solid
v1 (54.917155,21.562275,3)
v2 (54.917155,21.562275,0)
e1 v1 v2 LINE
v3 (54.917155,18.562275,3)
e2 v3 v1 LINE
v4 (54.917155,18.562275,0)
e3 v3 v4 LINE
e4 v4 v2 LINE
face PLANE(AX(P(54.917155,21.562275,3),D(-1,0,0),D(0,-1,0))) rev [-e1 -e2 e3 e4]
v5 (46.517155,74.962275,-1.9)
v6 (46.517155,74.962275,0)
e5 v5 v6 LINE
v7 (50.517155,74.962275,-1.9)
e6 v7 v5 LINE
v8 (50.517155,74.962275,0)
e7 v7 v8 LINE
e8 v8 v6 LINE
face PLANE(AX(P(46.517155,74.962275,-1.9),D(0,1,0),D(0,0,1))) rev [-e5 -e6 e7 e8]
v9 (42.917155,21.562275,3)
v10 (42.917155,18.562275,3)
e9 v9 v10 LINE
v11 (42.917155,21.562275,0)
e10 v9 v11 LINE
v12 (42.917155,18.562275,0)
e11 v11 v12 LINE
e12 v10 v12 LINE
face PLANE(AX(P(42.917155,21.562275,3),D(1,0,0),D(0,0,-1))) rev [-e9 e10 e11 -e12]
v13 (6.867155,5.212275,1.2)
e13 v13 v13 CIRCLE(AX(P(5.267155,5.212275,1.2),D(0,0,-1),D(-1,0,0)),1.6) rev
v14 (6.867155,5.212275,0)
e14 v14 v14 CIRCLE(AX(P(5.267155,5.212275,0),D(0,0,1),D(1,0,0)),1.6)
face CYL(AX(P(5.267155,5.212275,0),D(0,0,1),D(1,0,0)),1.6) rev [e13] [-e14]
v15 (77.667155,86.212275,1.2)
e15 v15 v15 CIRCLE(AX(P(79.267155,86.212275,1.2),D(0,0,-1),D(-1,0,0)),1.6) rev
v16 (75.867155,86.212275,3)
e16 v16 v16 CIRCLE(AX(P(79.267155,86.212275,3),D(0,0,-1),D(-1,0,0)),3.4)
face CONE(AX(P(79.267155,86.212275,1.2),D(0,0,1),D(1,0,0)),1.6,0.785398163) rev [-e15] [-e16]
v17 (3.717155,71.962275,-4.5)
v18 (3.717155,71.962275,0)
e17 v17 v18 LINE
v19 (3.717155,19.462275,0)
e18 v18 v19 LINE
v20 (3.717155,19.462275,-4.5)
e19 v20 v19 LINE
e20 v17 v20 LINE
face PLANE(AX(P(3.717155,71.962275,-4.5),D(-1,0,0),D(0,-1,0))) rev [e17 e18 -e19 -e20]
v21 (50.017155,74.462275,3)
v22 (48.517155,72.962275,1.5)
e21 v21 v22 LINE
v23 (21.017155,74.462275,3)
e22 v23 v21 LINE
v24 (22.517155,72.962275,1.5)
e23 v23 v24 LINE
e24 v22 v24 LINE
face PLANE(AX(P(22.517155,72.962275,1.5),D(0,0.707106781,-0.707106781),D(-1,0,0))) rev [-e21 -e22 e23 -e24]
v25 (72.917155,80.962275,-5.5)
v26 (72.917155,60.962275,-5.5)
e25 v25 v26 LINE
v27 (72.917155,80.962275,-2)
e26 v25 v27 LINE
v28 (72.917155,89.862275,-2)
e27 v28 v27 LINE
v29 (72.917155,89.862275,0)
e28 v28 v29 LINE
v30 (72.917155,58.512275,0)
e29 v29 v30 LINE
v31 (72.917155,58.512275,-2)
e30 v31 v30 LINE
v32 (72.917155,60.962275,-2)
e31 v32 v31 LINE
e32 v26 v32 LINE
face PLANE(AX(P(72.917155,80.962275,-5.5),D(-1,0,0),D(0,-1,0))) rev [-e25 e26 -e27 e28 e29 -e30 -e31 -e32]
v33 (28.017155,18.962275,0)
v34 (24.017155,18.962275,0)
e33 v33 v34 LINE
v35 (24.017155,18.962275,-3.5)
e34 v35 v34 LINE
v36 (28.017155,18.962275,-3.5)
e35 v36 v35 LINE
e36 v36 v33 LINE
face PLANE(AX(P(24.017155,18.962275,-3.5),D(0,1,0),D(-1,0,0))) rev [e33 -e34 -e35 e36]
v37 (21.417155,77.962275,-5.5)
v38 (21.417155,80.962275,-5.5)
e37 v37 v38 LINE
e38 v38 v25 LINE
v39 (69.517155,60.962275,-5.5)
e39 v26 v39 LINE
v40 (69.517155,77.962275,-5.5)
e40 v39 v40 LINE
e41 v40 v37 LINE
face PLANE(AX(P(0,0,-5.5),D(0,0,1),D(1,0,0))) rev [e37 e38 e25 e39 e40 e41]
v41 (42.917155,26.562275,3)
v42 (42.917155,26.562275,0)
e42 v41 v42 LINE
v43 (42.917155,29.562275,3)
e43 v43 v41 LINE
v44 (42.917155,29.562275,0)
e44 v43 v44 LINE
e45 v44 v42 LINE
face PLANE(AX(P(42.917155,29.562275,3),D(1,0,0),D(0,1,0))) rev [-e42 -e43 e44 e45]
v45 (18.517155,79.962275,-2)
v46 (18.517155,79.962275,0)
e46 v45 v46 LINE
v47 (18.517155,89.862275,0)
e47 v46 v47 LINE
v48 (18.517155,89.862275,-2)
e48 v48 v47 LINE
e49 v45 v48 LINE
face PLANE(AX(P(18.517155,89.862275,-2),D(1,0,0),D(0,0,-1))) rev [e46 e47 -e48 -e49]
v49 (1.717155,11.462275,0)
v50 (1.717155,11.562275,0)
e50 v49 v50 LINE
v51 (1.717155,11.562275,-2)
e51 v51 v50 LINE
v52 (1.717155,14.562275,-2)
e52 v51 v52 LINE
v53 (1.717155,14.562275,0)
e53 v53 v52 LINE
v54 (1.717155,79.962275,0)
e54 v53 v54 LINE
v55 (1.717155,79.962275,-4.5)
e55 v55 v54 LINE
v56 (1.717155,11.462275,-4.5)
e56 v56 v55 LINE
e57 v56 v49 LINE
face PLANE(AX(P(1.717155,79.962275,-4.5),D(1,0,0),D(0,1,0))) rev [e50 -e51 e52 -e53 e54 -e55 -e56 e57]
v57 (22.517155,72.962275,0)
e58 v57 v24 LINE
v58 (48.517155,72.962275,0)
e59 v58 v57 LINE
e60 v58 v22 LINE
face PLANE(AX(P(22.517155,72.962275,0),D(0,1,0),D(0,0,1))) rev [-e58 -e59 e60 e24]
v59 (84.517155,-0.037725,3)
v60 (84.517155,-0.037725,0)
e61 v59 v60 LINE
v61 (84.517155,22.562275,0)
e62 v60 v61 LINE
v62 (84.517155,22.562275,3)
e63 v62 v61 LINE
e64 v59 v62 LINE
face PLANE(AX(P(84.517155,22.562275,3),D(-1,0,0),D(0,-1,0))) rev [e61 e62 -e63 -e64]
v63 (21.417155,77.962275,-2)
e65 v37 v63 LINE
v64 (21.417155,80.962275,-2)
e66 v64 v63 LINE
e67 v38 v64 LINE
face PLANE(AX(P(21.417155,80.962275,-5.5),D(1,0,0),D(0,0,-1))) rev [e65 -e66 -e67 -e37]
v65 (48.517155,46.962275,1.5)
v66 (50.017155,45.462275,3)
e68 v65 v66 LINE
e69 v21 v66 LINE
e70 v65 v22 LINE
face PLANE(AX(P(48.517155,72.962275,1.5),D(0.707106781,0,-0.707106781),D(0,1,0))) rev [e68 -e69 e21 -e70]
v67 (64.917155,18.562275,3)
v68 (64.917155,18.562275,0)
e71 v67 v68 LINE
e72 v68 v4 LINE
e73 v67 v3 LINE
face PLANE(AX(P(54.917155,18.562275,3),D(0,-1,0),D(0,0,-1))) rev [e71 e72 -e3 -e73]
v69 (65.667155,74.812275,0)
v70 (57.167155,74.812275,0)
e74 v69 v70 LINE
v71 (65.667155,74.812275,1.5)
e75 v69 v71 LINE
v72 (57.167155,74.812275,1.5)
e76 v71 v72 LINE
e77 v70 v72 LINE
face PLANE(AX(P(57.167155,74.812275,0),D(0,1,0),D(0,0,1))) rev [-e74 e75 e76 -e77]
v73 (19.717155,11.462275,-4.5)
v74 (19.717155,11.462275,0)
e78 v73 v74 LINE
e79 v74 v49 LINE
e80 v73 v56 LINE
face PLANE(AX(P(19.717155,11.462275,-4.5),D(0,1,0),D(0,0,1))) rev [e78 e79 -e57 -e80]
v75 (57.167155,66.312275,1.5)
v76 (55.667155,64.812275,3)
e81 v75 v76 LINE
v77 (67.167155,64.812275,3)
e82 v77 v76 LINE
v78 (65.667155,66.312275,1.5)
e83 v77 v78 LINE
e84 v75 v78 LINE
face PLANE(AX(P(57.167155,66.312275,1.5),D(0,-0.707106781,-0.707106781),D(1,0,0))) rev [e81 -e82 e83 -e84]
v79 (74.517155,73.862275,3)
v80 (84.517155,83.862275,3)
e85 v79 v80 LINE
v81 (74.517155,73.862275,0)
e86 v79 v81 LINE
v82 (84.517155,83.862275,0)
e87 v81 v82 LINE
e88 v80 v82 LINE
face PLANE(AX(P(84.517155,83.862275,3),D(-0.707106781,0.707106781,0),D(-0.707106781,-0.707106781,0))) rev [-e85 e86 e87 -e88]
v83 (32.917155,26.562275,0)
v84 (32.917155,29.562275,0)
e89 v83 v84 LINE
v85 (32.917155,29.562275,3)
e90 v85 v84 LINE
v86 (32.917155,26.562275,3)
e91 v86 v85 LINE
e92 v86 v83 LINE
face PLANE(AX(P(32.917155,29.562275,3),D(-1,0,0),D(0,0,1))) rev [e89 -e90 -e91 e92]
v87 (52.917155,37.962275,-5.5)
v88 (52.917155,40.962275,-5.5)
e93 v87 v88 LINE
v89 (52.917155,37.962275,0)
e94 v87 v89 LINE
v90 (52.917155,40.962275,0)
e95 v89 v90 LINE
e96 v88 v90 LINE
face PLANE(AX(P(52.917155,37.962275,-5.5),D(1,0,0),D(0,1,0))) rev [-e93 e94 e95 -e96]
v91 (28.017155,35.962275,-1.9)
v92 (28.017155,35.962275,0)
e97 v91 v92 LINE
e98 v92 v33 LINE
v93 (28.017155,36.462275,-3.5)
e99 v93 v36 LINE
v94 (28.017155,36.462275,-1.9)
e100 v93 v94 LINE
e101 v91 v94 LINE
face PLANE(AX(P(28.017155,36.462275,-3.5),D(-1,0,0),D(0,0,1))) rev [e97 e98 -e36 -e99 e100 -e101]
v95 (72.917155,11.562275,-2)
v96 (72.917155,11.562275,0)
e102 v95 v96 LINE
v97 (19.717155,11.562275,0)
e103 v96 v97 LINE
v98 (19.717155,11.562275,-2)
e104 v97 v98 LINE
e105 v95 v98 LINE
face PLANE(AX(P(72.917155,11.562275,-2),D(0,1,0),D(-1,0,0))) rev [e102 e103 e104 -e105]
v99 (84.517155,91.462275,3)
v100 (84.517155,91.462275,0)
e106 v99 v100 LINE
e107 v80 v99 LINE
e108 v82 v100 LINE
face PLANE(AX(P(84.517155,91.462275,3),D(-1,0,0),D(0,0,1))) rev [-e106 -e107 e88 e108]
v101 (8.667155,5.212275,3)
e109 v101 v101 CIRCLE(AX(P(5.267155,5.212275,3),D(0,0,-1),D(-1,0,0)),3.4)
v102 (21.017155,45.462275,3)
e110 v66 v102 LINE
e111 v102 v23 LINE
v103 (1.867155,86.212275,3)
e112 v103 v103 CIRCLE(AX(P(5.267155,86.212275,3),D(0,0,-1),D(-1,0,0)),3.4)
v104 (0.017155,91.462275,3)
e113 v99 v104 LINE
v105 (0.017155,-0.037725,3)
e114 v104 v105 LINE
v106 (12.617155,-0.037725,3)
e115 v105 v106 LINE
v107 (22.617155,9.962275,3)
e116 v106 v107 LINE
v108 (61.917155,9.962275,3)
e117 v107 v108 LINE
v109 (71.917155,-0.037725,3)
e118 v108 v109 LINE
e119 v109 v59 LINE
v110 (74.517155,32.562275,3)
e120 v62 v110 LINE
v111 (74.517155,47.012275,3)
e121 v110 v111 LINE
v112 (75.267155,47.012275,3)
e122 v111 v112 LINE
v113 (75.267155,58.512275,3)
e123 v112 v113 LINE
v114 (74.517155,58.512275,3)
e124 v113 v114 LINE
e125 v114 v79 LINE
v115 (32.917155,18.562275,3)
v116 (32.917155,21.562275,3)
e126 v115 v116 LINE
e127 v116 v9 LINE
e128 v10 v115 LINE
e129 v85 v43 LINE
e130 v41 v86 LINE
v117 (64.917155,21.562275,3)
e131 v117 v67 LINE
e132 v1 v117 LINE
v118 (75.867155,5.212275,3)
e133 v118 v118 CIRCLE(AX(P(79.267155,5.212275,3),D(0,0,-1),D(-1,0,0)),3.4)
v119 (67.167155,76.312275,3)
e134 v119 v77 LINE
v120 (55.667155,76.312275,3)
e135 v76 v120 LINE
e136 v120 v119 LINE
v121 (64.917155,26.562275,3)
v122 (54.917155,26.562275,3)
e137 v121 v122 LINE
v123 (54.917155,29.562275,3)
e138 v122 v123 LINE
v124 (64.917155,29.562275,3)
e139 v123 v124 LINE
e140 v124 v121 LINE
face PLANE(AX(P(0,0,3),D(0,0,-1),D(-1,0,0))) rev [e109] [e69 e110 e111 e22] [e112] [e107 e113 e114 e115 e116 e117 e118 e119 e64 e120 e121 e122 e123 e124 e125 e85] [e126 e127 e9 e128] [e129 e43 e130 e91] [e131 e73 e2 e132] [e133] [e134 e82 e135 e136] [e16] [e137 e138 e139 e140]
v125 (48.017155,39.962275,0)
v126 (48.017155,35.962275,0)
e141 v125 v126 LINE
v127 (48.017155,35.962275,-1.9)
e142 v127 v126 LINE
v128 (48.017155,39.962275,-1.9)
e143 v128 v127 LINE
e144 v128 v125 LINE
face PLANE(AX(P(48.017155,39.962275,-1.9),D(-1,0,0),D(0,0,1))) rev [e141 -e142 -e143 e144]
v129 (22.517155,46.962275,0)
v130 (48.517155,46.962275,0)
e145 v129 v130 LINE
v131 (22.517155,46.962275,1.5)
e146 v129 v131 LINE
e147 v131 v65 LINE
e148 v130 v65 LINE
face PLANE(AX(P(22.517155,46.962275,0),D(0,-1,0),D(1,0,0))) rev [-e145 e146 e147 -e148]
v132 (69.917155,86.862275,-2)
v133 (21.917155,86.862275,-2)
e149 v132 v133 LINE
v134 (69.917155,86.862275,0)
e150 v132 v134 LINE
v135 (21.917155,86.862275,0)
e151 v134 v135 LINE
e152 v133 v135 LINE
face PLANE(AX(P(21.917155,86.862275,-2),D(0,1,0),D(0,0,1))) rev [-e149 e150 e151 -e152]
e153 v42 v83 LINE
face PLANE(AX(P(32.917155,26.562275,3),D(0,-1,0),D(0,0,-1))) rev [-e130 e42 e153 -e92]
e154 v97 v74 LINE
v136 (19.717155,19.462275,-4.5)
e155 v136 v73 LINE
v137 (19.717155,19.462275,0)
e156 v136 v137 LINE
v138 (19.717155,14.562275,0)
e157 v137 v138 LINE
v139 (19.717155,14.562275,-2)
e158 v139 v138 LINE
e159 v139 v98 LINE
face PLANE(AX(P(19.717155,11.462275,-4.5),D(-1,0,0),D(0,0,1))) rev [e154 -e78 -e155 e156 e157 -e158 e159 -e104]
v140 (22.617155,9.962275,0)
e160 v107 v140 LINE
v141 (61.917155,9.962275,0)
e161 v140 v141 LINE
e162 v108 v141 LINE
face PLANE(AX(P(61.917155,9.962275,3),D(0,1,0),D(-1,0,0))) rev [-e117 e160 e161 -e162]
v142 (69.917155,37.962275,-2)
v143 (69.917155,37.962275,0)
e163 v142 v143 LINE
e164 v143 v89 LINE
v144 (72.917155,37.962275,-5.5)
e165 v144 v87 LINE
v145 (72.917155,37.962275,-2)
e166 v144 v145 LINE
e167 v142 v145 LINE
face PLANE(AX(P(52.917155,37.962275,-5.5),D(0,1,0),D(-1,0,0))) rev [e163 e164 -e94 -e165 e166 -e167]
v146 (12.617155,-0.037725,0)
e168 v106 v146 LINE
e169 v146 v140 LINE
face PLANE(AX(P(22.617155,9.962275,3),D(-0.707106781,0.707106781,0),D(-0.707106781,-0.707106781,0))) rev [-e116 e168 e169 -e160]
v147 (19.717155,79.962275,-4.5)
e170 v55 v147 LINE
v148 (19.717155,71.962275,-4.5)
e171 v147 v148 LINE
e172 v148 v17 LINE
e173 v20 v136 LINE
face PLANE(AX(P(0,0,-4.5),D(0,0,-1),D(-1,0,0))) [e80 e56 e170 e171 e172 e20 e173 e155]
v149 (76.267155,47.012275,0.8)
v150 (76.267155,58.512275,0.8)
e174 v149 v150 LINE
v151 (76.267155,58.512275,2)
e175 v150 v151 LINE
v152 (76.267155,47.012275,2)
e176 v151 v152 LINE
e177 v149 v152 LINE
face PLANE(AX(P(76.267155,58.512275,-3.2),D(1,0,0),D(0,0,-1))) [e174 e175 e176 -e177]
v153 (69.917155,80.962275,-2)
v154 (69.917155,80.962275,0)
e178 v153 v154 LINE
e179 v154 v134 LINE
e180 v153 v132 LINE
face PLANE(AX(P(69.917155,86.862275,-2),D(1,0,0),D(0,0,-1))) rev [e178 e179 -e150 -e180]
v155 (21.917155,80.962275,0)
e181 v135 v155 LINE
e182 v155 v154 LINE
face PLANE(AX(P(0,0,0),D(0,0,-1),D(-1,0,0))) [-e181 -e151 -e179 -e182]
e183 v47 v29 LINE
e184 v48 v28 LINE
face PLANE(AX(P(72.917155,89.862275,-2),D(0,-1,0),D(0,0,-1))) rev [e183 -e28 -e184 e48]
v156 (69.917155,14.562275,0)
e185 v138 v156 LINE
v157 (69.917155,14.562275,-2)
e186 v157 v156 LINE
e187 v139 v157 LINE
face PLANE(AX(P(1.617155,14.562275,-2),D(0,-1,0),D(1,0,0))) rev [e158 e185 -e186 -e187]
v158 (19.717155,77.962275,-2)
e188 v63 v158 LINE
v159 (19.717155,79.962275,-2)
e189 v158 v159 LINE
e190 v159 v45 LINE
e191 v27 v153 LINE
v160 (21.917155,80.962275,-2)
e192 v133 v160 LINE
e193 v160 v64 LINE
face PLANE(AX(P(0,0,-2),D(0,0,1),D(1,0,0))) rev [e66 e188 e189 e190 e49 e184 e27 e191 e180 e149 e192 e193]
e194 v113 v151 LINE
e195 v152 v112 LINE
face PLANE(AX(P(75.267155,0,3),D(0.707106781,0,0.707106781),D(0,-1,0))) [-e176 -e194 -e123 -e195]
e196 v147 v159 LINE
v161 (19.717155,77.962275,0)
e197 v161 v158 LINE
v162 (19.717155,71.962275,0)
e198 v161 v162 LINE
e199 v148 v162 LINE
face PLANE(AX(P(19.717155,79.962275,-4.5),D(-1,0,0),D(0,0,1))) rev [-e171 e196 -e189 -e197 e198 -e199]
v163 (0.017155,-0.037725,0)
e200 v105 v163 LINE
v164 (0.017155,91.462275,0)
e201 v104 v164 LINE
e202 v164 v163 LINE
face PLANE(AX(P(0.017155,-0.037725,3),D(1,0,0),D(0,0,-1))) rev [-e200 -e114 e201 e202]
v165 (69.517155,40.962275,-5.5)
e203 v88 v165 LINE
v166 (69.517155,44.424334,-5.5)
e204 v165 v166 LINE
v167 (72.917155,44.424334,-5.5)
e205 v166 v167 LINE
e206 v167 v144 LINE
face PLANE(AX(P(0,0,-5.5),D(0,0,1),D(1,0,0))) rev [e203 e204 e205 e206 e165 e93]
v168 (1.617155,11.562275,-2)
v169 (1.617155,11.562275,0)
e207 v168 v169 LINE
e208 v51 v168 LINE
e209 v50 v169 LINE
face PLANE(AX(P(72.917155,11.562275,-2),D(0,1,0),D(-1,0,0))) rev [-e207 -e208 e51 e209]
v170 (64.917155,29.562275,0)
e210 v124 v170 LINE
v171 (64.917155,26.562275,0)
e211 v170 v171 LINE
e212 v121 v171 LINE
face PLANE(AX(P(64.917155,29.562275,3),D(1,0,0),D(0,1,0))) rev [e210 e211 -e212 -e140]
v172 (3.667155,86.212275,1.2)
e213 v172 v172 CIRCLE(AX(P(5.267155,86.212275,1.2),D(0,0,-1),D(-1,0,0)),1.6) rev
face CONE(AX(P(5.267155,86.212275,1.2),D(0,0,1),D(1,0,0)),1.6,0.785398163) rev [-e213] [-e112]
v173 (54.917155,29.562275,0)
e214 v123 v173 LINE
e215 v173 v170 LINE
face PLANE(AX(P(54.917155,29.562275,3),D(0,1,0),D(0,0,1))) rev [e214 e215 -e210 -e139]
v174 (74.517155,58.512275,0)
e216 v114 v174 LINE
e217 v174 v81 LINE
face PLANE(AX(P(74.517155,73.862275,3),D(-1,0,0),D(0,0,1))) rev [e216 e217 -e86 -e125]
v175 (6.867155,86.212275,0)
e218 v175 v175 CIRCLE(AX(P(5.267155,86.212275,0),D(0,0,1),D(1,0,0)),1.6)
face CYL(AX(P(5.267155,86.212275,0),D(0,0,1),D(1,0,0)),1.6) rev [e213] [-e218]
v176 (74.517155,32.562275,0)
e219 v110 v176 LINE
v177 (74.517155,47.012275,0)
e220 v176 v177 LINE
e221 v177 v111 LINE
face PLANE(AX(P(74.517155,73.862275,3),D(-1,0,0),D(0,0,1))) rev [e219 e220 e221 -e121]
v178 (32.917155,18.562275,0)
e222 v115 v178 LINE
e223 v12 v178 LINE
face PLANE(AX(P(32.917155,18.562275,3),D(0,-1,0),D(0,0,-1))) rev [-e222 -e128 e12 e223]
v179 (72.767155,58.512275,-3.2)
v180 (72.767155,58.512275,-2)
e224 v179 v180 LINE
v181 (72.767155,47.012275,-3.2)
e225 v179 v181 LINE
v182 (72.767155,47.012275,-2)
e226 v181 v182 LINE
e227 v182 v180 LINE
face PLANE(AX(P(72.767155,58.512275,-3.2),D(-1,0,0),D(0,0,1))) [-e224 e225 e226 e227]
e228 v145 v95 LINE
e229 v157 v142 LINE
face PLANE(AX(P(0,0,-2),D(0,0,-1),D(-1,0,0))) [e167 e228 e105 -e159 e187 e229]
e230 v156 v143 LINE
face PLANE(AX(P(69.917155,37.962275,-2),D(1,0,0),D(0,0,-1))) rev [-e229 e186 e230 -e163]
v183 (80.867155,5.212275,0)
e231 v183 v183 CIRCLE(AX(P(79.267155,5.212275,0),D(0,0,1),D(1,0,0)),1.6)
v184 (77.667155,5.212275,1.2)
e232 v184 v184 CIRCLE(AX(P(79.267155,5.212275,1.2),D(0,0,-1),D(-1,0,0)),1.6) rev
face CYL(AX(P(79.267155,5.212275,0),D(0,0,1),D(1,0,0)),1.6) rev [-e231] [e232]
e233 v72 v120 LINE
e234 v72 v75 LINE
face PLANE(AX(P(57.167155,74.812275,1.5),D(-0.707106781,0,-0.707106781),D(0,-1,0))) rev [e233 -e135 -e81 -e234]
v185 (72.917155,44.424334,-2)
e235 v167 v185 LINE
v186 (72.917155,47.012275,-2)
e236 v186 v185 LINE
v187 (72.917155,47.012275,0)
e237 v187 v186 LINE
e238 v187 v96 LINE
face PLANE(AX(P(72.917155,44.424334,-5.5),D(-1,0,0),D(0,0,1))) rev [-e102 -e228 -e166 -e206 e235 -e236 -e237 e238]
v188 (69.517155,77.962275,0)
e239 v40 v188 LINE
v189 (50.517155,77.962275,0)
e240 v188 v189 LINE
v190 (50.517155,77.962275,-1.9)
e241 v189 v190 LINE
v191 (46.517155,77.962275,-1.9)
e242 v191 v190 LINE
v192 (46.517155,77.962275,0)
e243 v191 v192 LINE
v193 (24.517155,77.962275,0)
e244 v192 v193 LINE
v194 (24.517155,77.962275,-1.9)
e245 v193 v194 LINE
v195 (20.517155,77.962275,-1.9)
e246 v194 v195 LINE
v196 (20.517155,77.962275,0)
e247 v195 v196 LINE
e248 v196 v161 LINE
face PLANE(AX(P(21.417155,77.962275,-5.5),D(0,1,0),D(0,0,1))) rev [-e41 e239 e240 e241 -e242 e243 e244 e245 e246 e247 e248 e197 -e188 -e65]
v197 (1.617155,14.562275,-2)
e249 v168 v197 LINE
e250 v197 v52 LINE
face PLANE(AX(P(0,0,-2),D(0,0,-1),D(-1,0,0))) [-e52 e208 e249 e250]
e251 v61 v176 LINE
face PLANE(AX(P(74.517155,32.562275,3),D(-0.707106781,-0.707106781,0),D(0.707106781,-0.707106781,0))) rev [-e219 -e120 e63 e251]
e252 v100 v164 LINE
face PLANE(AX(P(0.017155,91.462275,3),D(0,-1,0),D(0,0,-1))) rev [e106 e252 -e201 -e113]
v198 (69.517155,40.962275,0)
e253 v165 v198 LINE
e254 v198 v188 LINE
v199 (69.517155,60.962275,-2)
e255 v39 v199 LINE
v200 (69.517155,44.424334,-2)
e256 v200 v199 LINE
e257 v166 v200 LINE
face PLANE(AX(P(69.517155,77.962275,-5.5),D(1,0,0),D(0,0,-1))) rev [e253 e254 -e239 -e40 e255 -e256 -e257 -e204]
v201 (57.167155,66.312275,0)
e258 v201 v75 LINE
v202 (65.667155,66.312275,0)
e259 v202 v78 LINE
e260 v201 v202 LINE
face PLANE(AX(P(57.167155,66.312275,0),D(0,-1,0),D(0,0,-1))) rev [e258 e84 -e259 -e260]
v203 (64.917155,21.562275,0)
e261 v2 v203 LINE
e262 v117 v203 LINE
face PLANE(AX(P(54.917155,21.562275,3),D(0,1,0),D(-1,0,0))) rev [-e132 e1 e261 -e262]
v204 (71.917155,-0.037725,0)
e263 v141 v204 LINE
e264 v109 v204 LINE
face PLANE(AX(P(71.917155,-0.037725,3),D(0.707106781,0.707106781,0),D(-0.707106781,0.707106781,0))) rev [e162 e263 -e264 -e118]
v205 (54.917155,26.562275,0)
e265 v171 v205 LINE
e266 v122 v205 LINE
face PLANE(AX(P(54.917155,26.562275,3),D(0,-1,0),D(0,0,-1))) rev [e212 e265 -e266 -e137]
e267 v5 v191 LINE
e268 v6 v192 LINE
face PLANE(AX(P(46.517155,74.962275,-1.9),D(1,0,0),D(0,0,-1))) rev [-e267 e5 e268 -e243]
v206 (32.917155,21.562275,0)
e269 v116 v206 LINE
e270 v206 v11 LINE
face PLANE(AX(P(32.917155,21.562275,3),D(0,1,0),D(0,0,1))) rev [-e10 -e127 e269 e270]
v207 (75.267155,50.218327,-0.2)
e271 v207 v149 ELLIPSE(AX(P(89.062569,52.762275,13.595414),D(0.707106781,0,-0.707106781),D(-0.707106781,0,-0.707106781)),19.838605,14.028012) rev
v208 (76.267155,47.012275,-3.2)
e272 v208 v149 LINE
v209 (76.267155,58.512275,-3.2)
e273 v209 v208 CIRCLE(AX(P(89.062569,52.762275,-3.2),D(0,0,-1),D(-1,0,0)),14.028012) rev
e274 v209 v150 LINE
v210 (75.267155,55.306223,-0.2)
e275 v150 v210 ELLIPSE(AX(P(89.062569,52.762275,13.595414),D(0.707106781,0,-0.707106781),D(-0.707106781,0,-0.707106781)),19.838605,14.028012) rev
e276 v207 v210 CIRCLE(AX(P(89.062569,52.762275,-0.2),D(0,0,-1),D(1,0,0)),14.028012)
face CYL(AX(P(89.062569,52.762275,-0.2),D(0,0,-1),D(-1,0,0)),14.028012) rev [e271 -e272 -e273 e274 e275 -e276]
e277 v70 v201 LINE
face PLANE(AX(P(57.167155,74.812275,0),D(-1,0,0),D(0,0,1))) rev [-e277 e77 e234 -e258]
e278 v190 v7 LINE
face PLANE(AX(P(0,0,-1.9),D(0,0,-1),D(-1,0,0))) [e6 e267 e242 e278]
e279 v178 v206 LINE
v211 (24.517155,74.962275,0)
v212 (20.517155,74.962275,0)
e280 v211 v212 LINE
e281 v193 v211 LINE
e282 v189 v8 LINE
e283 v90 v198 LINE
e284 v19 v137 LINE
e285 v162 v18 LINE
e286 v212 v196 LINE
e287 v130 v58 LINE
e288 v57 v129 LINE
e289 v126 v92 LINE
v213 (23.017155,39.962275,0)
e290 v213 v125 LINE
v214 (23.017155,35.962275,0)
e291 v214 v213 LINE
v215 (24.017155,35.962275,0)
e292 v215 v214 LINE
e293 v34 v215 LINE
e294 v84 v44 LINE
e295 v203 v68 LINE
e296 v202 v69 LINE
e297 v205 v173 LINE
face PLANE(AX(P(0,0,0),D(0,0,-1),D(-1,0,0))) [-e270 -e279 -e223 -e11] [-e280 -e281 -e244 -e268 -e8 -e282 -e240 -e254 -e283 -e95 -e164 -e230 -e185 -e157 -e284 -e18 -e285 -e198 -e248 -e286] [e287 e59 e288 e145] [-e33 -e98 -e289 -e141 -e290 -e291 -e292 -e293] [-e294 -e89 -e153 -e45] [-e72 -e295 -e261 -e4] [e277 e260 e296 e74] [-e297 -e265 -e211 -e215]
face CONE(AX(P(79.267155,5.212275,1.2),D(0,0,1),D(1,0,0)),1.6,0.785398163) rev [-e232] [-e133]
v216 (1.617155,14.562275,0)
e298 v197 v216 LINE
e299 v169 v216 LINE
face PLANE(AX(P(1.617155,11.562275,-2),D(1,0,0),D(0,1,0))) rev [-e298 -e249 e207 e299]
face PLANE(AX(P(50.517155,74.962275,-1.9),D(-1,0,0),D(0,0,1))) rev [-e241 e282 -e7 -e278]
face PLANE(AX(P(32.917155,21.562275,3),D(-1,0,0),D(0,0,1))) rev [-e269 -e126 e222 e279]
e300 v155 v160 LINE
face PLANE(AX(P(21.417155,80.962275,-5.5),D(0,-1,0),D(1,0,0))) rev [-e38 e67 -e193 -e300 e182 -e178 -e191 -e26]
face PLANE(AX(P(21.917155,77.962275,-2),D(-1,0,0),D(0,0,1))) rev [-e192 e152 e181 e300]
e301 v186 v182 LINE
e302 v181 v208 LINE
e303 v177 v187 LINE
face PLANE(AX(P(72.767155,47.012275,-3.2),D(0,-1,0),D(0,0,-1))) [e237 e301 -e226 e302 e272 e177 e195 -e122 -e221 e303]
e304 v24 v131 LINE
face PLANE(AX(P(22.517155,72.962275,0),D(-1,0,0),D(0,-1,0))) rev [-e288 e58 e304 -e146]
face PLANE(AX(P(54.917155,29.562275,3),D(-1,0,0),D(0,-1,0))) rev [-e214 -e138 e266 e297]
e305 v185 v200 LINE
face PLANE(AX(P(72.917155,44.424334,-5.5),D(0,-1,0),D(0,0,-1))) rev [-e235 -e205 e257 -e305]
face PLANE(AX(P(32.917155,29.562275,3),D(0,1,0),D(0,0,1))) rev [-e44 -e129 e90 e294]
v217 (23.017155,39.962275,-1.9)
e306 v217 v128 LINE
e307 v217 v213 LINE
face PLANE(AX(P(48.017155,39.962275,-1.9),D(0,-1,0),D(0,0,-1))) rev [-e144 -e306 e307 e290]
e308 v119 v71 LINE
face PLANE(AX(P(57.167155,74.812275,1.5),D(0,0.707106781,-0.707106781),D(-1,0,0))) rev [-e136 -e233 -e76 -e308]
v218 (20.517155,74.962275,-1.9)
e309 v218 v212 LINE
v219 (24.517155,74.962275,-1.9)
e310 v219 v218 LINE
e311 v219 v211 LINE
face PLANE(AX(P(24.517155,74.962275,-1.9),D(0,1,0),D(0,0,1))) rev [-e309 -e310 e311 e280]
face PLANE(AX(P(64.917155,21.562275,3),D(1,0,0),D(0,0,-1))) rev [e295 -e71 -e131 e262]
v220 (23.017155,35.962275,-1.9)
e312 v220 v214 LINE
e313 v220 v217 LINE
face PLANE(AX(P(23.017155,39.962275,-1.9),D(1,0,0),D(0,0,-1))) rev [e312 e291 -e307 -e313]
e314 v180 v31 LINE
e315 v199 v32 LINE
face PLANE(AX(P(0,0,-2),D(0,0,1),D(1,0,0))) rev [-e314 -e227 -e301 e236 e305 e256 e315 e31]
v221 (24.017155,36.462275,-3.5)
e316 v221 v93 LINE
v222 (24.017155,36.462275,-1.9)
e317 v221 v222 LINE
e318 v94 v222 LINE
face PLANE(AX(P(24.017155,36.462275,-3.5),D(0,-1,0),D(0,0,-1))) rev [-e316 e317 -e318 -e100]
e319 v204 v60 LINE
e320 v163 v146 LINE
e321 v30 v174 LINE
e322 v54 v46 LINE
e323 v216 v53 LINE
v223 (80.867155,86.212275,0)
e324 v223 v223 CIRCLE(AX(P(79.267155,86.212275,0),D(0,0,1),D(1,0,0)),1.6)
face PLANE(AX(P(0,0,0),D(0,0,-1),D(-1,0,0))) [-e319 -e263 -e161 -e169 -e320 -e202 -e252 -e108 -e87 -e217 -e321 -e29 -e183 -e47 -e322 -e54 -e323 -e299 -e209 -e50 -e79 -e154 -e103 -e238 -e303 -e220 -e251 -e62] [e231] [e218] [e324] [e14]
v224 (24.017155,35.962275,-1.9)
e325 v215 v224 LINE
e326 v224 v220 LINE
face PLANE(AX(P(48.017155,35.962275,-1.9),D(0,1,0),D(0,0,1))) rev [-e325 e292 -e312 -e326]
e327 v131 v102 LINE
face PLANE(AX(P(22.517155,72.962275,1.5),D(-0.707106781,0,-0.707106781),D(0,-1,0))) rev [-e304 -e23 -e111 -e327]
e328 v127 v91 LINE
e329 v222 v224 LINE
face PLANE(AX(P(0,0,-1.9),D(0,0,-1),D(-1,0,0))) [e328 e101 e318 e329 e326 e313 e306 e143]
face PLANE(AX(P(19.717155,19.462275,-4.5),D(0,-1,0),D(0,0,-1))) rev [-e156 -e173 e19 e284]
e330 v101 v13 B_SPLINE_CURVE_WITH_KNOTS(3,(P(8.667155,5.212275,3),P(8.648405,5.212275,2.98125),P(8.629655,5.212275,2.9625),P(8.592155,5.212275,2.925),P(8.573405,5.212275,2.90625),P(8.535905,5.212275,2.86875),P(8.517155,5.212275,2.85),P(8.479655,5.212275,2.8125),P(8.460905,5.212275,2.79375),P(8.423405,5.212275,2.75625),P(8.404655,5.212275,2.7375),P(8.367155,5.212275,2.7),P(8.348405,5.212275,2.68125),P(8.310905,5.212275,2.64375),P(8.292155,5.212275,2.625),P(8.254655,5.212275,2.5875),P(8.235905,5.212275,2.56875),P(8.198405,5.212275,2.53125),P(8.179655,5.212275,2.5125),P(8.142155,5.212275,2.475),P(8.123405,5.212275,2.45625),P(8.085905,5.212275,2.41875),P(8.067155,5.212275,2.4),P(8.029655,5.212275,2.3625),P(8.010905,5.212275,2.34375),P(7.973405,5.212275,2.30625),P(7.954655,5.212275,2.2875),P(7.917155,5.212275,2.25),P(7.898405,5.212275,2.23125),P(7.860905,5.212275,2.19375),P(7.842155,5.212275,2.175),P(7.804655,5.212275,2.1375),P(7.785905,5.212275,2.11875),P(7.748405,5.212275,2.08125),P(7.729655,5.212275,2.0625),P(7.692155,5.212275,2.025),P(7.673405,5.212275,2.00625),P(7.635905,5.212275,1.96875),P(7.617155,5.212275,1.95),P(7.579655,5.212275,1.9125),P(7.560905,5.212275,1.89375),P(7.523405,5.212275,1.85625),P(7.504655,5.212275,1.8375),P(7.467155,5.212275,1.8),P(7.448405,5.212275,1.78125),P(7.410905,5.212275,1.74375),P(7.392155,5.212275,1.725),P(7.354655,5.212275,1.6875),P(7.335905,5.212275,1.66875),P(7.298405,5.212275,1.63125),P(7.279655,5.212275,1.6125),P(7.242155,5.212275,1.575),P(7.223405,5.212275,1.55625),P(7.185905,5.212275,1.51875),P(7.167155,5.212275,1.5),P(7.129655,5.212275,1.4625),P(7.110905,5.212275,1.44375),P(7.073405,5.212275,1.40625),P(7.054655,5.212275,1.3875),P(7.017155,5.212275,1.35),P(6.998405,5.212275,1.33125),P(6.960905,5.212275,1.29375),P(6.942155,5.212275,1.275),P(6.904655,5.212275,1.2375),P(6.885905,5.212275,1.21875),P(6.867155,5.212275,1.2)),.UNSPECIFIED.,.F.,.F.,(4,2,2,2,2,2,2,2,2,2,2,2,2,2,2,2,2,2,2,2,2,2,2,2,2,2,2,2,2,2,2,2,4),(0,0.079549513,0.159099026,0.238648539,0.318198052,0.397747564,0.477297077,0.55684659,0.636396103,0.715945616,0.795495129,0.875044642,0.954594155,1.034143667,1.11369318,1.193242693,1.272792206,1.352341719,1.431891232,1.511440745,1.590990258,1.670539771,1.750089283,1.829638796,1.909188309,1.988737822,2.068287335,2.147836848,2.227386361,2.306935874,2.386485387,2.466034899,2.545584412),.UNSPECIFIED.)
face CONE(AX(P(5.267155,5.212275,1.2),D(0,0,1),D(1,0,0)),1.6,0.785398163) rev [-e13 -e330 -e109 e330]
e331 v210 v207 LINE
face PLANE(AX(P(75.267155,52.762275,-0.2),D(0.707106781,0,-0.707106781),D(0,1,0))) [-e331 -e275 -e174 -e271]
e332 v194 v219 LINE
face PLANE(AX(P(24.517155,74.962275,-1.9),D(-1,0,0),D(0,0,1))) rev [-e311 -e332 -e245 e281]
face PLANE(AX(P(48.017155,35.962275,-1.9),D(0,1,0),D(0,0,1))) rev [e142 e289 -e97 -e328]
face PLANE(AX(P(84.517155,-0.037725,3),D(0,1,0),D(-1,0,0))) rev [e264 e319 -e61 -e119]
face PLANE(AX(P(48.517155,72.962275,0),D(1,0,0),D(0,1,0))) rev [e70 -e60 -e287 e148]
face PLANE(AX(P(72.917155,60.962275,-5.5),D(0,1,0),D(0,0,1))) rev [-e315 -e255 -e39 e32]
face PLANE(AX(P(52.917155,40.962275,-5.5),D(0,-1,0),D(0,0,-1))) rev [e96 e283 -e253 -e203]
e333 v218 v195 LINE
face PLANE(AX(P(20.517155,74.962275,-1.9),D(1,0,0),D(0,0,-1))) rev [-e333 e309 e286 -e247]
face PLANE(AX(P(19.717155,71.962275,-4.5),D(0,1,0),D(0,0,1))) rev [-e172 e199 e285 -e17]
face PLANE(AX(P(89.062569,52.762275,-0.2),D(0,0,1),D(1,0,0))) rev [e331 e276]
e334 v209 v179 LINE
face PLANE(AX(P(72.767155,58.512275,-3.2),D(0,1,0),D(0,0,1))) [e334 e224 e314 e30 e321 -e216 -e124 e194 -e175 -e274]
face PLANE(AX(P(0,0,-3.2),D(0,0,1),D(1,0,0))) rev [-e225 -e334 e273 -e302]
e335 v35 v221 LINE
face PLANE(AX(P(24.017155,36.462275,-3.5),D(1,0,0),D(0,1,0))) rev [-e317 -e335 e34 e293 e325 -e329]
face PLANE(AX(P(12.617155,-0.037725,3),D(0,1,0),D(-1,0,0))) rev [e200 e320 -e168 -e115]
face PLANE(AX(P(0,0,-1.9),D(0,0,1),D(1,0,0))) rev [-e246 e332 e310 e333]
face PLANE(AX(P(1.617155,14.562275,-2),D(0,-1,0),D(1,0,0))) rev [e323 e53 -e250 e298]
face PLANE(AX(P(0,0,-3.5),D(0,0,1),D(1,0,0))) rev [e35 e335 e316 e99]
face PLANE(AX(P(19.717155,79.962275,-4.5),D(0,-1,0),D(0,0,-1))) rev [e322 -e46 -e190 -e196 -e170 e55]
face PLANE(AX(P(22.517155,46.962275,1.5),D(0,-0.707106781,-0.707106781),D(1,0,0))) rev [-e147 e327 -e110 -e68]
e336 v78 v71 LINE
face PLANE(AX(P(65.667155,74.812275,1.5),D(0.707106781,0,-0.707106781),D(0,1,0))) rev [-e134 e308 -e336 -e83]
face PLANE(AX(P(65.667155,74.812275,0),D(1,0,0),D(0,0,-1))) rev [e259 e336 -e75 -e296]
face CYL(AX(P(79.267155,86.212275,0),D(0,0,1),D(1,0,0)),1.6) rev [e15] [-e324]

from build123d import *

# Parameters (mm, degrees)
BOSS_EXTRUDE1_DEPTH     = 3
SKETCH3_R               = 1.6
CUT_EXTRUDE1_DEPTH      = 3
CHAMFER1_SIZE           = 1.8
SKETCH5_W               = 26
SKETCH5_H               = 26
SKETCH5_W_2             = 8.5
SKETCH5_H_2             = 8.5
CUT_EXTRUDE2_DEPTH      = 3
CHAMFER2_SIZE           = 1.5
SKETCH7_W               = 3.5
SKETCH7_H               = 11.5
BOSS_EXTRUDE3_DEPTH     = 6.2
CUT_EXTRUDE3_DEPTH      = 125.687357779
CUT_EXTRUDE3_DEPTH_BACK = 3
CHAMFER3_SIZE           = 1
SKETCH9_W               = 25
SKETCH9_H               = 4
SKETCH9_W_2             = 4
SKETCH9_H_2             = 5
BOSS_EXTRUDE4_DEPTH     = 1.9
BOSS_EXTRUDE5_DEPTH     = 5.5
SKETCH11_W              = 4
SKETCH11_H              = 17.5
BOSS_EXTRUDE6_DEPTH     = 3.5
BOSS_EXTRUDE7_DEPTH     = 4.5
SKETCH13_W              = 3.4
SKETCH13_H              = 16.58647312
BOSS_EXTRUDE8_DEPTH     = 2
SKETCH14_W              = 10
SKETCH14_H              = 3
CUT_EXTRUDE4_DEPTH      = 3
CHAMFER4_SIZE           = 1


with BuildPart() as part:
    # Sketch1 → Boss-Extrude1 (new body)
    with BuildSketch(Plane.XY):
        Polygon((0.01715505, 91.462274694), (84.51715505, 91.462274694), (84.51715505, 83.862274694), (74.51715505, 73.862274694), (74.51715505, 32.562274694), (84.51715505, 22.562274694), (84.51715505, -0.037725306), (71.91715505, -0.037725306), (61.91715505, 9.962274694), (22.61715505, 9.962274694), (12.61715505, -0.037725306), (0.01715505, -0.037725306), align=None)
    extrude(amount=BOSS_EXTRUDE1_DEPTH)

    # Sketch3 → Cut-Extrude1 (cut)
    with BuildSketch(Plane.XY.offset(3)):
        with Locations((5.26715505, 86.212274694)):
            Circle(SKETCH3_R)
        with Locations((79.26715505, 86.212274694)):
            Circle(SKETCH3_R)
        with Locations((5.26715505, 5.212274694)):
            Circle(SKETCH3_R)
        with Locations((79.26715505, 5.212274694)):
            Circle(SKETCH3_R)
    extrude(amount=-CUT_EXTRUDE1_DEPTH, mode=Mode.SUBTRACT)

    # Chamfer1
    chamfer1_edges = [part.edges().sort_by_distance(p)[0] for p in [
        (77.66715505, 86.212274694, 3),
        (3.66715505, 5.212274694, 3),
        (77.66715505, 5.212274694, 3),
        (3.66715505, 86.212274694, 3),
    ]]
    chamfer(chamfer1_edges, length=CHAMFER1_SIZE)

    # Sketch5 → Cut-Extrude2 (cut)
    with BuildSketch(Plane.XY.offset(3)):
        with Locations((35.51715505, 59.962274694)):
            Rectangle(SKETCH5_W, SKETCH5_H)
        with Locations((61.41715505, 70.562274694)):
            Rectangle(SKETCH5_W_2, SKETCH5_H_2)
    extrude(amount=-CUT_EXTRUDE2_DEPTH, mode=Mode.SUBTRACT)

    # Chamfer2
    chamfer2_edges = [part.edges().sort_by_distance(p)[0] for p in [
        (57.16715505, 70.562274694, 3),
        (61.41715505, 66.312274694, 3),
        (65.66715505, 70.562274694, 3),
        (61.41715505, 74.812274694, 3),
        (22.51715505, 59.962274694, 3),
        (35.51715505, 46.962274694, 3),
        (48.51715505, 59.962274694, 3),
        (35.51715505, 72.962274694, 3),
    ]]
    chamfer(chamfer2_edges, length=CHAMFER2_SIZE)

    # Sketch7 → Boss-Extrude3 (add)
    with BuildSketch(Plane.XY.offset(3)):
        with Locations((74.51715505, 52.762274694)):
            Rectangle(SKETCH7_W, SKETCH7_H)
    extrude(amount=-BOSS_EXTRUDE3_DEPTH)

    # Sketch8 → Cut-Extrude3 (cut, two sides: drawn at the far end of the back side and taken through both)
    with BuildSketch(Plane(origin=(0, 0, -3.2), x_dir=(-1, 0, 0), z_dir=(0, 0, -1)).offset(-CUT_EXTRUDE3_DEPTH_BACK)):
        with BuildLine():
            Line((-76.26715505, 58.512274694), (-76.26715505, 47.012274694))
            ThreePointArc((-76.26715505, 47.012274694), (-75.034557132, 52.762274694), (-76.26715505, 58.512274694))
        make_face()
    extrude(amount=CUT_EXTRUDE3_DEPTH + CUT_EXTRUDE3_DEPTH_BACK, mode=Mode.SUBTRACT)

    # Chamfer3
    # the kernel refuses this chamfer: 1 mm, written as the material it takes off along each edge
    with BuildSketch(Plane(origin=(76.26715505, 61.083957682, -0.2), x_dir=(0.02749587661058217, 0, 0.9996219169112968), z_dir=(0, -1, 0))) as chamfer3_piece_1_section:
        Polygon((CHAMFER3_SIZE * 0.999621916911, CHAMFER3_SIZE * 0.0274958766106), (-CHAMFER3_SIZE * 0.0274958766106, CHAMFER3_SIZE * 0.999621916911), (0, 0), align=None)
    chamfer3_piece_1 = extrude(amount=16.643365976, mode=Mode.PRIVATE)
    chamfer3_piece_1 = chamfer3_piece_1 & Plane(origin=(89.06256948, 52.762274694, 0.149616296), x_dir=(-0.9121331028647569, -0.4098941359159838, 0), z_dir=(0, 0, 1)) * Cylinder(14.028012348, 38, mode=Mode.PRIVATE)
    add(chamfer3_piece_1, mode=Mode.SUBTRACT)

    # Sketch9 → Boss-Extrude4 (add)
    with BuildSketch(Plane(origin=(0, 0, 0), x_dir=(-1, 0, 0), z_dir=(0, 0, -1))):
        with Locations((-35.51715505, 37.962274694)):
            Rectangle(SKETCH9_W, SKETCH9_H)
        with Locations((-48.51715505, 77.462274694)):
            Rectangle(SKETCH9_W_2, SKETCH9_H_2)
        with Locations((-22.51715505, 77.462274694)):
            Rectangle(SKETCH9_W_2, SKETCH9_H_2)
    extrude(amount=BOSS_EXTRUDE4_DEPTH)

    # Sketch10 → Boss-Extrude5 (add)
    with BuildSketch(Plane(origin=(0, 0, 0), x_dir=(-1, 0, 0), z_dir=(0, 0, -1))):
        Polygon((-21.41715505, 80.962274694), (-72.91715505, 80.962274694), (-72.91715505, 60.962274694), (-69.51715505, 60.962274694), (-69.51715505, 77.962274694), (-21.41715505, 77.962274694), align=None)
        Polygon((-72.91715505, 44.424333564), (-69.51715505, 44.424333564), (-69.51715505, 40.962274694), (-52.91715505, 40.962274694), (-52.91715505, 37.962274694), (-72.91715505, 37.962274694), align=None)
    extrude(amount=BOSS_EXTRUDE5_DEPTH)

    # Sketch11 → Boss-Extrude6 (add)
    with BuildSketch(Plane(origin=(0, 0, 0), x_dir=(-1, 0, 0), z_dir=(0, 0, -1))):
        with Locations((-26.01715505, 27.712274694)):
            Rectangle(SKETCH11_W, SKETCH11_H)
    extrude(amount=BOSS_EXTRUDE6_DEPTH)

    # Sketch12 → Boss-Extrude7 (add)
    with BuildSketch(Plane(origin=(0, 0, 0), x_dir=(-1, 0, 0), z_dir=(0, 0, -1))):
        Polygon((-19.71715505, 79.962274694), (-1.71715505, 79.962274694), (-1.71715505, 72.462274694), (-1.71715505, 19.462274694), (-1.71715505, 11.462274694), (-19.71715505, 11.462274694), (-19.71715505, 19.462274694), (-3.71715505, 19.462274694), (-3.71715505, 71.962274694), (-19.71715505, 71.962274694), align=None)
    extrude(amount=BOSS_EXTRUDE7_DEPTH)

    # Sketch13 → Boss-Extrude8 (add)
    with BuildSketch(Plane(origin=(0, 0, 0), x_dir=(-1, 0, 0), z_dir=(0, 0, -1))):
        Polygon((-18.51715505, 77.962274694), (-21.91715505, 77.962274694), (-21.91715505, 86.862274694), (-69.91715505, 86.862274694), (-69.91715505, 80.962274694), (-72.91715505, 80.962274694), (-72.91715505, 89.862274694), (-18.51715505, 89.862274694), align=None)
        Polygon((-72.91715505, 37.962274694), (-69.91715505, 37.962274694), (-69.91715505, 14.562274694), (-1.61715505, 14.562274694), (-1.61715505, 11.562274694), (-72.91715505, 11.562274694), align=None)
        with Locations((-71.21715505, 52.669038134)):
            Rectangle(SKETCH13_W, SKETCH13_H)
    extrude(amount=BOSS_EXTRUDE8_DEPTH)

    # Sketch14 → Cut-Extrude4 (cut)
    with BuildSketch(Plane(origin=(0, 0, 0), x_dir=(-1, 0, 0), z_dir=(0, 0, -1))):
        with Locations((-37.91715505, 20.062274694)):
            Rectangle(SKETCH14_W, SKETCH14_H)
        with Locations((-59.91715505, 20.062274694)):
            Rectangle(SKETCH14_W, SKETCH14_H)
        with Locations((-37.91715505, 28.062274694)):
            Rectangle(SKETCH14_W, SKETCH14_H)
        with Locations((-59.91715505, 28.062274694)):
            Rectangle(SKETCH14_W, SKETCH14_H)
    extrude(amount=-CUT_EXTRUDE4_DEPTH, mode=Mode.SUBTRACT)

    # Chamfer4
    chamfer4_edges = [part.edges().sort_by_distance(p)[0] for p in [
        (76.26715505, 52.762274694, 3),
    ]]
    chamfer(chamfer4_edges, length=CHAMFER4_SIZE)


solid = part.part
